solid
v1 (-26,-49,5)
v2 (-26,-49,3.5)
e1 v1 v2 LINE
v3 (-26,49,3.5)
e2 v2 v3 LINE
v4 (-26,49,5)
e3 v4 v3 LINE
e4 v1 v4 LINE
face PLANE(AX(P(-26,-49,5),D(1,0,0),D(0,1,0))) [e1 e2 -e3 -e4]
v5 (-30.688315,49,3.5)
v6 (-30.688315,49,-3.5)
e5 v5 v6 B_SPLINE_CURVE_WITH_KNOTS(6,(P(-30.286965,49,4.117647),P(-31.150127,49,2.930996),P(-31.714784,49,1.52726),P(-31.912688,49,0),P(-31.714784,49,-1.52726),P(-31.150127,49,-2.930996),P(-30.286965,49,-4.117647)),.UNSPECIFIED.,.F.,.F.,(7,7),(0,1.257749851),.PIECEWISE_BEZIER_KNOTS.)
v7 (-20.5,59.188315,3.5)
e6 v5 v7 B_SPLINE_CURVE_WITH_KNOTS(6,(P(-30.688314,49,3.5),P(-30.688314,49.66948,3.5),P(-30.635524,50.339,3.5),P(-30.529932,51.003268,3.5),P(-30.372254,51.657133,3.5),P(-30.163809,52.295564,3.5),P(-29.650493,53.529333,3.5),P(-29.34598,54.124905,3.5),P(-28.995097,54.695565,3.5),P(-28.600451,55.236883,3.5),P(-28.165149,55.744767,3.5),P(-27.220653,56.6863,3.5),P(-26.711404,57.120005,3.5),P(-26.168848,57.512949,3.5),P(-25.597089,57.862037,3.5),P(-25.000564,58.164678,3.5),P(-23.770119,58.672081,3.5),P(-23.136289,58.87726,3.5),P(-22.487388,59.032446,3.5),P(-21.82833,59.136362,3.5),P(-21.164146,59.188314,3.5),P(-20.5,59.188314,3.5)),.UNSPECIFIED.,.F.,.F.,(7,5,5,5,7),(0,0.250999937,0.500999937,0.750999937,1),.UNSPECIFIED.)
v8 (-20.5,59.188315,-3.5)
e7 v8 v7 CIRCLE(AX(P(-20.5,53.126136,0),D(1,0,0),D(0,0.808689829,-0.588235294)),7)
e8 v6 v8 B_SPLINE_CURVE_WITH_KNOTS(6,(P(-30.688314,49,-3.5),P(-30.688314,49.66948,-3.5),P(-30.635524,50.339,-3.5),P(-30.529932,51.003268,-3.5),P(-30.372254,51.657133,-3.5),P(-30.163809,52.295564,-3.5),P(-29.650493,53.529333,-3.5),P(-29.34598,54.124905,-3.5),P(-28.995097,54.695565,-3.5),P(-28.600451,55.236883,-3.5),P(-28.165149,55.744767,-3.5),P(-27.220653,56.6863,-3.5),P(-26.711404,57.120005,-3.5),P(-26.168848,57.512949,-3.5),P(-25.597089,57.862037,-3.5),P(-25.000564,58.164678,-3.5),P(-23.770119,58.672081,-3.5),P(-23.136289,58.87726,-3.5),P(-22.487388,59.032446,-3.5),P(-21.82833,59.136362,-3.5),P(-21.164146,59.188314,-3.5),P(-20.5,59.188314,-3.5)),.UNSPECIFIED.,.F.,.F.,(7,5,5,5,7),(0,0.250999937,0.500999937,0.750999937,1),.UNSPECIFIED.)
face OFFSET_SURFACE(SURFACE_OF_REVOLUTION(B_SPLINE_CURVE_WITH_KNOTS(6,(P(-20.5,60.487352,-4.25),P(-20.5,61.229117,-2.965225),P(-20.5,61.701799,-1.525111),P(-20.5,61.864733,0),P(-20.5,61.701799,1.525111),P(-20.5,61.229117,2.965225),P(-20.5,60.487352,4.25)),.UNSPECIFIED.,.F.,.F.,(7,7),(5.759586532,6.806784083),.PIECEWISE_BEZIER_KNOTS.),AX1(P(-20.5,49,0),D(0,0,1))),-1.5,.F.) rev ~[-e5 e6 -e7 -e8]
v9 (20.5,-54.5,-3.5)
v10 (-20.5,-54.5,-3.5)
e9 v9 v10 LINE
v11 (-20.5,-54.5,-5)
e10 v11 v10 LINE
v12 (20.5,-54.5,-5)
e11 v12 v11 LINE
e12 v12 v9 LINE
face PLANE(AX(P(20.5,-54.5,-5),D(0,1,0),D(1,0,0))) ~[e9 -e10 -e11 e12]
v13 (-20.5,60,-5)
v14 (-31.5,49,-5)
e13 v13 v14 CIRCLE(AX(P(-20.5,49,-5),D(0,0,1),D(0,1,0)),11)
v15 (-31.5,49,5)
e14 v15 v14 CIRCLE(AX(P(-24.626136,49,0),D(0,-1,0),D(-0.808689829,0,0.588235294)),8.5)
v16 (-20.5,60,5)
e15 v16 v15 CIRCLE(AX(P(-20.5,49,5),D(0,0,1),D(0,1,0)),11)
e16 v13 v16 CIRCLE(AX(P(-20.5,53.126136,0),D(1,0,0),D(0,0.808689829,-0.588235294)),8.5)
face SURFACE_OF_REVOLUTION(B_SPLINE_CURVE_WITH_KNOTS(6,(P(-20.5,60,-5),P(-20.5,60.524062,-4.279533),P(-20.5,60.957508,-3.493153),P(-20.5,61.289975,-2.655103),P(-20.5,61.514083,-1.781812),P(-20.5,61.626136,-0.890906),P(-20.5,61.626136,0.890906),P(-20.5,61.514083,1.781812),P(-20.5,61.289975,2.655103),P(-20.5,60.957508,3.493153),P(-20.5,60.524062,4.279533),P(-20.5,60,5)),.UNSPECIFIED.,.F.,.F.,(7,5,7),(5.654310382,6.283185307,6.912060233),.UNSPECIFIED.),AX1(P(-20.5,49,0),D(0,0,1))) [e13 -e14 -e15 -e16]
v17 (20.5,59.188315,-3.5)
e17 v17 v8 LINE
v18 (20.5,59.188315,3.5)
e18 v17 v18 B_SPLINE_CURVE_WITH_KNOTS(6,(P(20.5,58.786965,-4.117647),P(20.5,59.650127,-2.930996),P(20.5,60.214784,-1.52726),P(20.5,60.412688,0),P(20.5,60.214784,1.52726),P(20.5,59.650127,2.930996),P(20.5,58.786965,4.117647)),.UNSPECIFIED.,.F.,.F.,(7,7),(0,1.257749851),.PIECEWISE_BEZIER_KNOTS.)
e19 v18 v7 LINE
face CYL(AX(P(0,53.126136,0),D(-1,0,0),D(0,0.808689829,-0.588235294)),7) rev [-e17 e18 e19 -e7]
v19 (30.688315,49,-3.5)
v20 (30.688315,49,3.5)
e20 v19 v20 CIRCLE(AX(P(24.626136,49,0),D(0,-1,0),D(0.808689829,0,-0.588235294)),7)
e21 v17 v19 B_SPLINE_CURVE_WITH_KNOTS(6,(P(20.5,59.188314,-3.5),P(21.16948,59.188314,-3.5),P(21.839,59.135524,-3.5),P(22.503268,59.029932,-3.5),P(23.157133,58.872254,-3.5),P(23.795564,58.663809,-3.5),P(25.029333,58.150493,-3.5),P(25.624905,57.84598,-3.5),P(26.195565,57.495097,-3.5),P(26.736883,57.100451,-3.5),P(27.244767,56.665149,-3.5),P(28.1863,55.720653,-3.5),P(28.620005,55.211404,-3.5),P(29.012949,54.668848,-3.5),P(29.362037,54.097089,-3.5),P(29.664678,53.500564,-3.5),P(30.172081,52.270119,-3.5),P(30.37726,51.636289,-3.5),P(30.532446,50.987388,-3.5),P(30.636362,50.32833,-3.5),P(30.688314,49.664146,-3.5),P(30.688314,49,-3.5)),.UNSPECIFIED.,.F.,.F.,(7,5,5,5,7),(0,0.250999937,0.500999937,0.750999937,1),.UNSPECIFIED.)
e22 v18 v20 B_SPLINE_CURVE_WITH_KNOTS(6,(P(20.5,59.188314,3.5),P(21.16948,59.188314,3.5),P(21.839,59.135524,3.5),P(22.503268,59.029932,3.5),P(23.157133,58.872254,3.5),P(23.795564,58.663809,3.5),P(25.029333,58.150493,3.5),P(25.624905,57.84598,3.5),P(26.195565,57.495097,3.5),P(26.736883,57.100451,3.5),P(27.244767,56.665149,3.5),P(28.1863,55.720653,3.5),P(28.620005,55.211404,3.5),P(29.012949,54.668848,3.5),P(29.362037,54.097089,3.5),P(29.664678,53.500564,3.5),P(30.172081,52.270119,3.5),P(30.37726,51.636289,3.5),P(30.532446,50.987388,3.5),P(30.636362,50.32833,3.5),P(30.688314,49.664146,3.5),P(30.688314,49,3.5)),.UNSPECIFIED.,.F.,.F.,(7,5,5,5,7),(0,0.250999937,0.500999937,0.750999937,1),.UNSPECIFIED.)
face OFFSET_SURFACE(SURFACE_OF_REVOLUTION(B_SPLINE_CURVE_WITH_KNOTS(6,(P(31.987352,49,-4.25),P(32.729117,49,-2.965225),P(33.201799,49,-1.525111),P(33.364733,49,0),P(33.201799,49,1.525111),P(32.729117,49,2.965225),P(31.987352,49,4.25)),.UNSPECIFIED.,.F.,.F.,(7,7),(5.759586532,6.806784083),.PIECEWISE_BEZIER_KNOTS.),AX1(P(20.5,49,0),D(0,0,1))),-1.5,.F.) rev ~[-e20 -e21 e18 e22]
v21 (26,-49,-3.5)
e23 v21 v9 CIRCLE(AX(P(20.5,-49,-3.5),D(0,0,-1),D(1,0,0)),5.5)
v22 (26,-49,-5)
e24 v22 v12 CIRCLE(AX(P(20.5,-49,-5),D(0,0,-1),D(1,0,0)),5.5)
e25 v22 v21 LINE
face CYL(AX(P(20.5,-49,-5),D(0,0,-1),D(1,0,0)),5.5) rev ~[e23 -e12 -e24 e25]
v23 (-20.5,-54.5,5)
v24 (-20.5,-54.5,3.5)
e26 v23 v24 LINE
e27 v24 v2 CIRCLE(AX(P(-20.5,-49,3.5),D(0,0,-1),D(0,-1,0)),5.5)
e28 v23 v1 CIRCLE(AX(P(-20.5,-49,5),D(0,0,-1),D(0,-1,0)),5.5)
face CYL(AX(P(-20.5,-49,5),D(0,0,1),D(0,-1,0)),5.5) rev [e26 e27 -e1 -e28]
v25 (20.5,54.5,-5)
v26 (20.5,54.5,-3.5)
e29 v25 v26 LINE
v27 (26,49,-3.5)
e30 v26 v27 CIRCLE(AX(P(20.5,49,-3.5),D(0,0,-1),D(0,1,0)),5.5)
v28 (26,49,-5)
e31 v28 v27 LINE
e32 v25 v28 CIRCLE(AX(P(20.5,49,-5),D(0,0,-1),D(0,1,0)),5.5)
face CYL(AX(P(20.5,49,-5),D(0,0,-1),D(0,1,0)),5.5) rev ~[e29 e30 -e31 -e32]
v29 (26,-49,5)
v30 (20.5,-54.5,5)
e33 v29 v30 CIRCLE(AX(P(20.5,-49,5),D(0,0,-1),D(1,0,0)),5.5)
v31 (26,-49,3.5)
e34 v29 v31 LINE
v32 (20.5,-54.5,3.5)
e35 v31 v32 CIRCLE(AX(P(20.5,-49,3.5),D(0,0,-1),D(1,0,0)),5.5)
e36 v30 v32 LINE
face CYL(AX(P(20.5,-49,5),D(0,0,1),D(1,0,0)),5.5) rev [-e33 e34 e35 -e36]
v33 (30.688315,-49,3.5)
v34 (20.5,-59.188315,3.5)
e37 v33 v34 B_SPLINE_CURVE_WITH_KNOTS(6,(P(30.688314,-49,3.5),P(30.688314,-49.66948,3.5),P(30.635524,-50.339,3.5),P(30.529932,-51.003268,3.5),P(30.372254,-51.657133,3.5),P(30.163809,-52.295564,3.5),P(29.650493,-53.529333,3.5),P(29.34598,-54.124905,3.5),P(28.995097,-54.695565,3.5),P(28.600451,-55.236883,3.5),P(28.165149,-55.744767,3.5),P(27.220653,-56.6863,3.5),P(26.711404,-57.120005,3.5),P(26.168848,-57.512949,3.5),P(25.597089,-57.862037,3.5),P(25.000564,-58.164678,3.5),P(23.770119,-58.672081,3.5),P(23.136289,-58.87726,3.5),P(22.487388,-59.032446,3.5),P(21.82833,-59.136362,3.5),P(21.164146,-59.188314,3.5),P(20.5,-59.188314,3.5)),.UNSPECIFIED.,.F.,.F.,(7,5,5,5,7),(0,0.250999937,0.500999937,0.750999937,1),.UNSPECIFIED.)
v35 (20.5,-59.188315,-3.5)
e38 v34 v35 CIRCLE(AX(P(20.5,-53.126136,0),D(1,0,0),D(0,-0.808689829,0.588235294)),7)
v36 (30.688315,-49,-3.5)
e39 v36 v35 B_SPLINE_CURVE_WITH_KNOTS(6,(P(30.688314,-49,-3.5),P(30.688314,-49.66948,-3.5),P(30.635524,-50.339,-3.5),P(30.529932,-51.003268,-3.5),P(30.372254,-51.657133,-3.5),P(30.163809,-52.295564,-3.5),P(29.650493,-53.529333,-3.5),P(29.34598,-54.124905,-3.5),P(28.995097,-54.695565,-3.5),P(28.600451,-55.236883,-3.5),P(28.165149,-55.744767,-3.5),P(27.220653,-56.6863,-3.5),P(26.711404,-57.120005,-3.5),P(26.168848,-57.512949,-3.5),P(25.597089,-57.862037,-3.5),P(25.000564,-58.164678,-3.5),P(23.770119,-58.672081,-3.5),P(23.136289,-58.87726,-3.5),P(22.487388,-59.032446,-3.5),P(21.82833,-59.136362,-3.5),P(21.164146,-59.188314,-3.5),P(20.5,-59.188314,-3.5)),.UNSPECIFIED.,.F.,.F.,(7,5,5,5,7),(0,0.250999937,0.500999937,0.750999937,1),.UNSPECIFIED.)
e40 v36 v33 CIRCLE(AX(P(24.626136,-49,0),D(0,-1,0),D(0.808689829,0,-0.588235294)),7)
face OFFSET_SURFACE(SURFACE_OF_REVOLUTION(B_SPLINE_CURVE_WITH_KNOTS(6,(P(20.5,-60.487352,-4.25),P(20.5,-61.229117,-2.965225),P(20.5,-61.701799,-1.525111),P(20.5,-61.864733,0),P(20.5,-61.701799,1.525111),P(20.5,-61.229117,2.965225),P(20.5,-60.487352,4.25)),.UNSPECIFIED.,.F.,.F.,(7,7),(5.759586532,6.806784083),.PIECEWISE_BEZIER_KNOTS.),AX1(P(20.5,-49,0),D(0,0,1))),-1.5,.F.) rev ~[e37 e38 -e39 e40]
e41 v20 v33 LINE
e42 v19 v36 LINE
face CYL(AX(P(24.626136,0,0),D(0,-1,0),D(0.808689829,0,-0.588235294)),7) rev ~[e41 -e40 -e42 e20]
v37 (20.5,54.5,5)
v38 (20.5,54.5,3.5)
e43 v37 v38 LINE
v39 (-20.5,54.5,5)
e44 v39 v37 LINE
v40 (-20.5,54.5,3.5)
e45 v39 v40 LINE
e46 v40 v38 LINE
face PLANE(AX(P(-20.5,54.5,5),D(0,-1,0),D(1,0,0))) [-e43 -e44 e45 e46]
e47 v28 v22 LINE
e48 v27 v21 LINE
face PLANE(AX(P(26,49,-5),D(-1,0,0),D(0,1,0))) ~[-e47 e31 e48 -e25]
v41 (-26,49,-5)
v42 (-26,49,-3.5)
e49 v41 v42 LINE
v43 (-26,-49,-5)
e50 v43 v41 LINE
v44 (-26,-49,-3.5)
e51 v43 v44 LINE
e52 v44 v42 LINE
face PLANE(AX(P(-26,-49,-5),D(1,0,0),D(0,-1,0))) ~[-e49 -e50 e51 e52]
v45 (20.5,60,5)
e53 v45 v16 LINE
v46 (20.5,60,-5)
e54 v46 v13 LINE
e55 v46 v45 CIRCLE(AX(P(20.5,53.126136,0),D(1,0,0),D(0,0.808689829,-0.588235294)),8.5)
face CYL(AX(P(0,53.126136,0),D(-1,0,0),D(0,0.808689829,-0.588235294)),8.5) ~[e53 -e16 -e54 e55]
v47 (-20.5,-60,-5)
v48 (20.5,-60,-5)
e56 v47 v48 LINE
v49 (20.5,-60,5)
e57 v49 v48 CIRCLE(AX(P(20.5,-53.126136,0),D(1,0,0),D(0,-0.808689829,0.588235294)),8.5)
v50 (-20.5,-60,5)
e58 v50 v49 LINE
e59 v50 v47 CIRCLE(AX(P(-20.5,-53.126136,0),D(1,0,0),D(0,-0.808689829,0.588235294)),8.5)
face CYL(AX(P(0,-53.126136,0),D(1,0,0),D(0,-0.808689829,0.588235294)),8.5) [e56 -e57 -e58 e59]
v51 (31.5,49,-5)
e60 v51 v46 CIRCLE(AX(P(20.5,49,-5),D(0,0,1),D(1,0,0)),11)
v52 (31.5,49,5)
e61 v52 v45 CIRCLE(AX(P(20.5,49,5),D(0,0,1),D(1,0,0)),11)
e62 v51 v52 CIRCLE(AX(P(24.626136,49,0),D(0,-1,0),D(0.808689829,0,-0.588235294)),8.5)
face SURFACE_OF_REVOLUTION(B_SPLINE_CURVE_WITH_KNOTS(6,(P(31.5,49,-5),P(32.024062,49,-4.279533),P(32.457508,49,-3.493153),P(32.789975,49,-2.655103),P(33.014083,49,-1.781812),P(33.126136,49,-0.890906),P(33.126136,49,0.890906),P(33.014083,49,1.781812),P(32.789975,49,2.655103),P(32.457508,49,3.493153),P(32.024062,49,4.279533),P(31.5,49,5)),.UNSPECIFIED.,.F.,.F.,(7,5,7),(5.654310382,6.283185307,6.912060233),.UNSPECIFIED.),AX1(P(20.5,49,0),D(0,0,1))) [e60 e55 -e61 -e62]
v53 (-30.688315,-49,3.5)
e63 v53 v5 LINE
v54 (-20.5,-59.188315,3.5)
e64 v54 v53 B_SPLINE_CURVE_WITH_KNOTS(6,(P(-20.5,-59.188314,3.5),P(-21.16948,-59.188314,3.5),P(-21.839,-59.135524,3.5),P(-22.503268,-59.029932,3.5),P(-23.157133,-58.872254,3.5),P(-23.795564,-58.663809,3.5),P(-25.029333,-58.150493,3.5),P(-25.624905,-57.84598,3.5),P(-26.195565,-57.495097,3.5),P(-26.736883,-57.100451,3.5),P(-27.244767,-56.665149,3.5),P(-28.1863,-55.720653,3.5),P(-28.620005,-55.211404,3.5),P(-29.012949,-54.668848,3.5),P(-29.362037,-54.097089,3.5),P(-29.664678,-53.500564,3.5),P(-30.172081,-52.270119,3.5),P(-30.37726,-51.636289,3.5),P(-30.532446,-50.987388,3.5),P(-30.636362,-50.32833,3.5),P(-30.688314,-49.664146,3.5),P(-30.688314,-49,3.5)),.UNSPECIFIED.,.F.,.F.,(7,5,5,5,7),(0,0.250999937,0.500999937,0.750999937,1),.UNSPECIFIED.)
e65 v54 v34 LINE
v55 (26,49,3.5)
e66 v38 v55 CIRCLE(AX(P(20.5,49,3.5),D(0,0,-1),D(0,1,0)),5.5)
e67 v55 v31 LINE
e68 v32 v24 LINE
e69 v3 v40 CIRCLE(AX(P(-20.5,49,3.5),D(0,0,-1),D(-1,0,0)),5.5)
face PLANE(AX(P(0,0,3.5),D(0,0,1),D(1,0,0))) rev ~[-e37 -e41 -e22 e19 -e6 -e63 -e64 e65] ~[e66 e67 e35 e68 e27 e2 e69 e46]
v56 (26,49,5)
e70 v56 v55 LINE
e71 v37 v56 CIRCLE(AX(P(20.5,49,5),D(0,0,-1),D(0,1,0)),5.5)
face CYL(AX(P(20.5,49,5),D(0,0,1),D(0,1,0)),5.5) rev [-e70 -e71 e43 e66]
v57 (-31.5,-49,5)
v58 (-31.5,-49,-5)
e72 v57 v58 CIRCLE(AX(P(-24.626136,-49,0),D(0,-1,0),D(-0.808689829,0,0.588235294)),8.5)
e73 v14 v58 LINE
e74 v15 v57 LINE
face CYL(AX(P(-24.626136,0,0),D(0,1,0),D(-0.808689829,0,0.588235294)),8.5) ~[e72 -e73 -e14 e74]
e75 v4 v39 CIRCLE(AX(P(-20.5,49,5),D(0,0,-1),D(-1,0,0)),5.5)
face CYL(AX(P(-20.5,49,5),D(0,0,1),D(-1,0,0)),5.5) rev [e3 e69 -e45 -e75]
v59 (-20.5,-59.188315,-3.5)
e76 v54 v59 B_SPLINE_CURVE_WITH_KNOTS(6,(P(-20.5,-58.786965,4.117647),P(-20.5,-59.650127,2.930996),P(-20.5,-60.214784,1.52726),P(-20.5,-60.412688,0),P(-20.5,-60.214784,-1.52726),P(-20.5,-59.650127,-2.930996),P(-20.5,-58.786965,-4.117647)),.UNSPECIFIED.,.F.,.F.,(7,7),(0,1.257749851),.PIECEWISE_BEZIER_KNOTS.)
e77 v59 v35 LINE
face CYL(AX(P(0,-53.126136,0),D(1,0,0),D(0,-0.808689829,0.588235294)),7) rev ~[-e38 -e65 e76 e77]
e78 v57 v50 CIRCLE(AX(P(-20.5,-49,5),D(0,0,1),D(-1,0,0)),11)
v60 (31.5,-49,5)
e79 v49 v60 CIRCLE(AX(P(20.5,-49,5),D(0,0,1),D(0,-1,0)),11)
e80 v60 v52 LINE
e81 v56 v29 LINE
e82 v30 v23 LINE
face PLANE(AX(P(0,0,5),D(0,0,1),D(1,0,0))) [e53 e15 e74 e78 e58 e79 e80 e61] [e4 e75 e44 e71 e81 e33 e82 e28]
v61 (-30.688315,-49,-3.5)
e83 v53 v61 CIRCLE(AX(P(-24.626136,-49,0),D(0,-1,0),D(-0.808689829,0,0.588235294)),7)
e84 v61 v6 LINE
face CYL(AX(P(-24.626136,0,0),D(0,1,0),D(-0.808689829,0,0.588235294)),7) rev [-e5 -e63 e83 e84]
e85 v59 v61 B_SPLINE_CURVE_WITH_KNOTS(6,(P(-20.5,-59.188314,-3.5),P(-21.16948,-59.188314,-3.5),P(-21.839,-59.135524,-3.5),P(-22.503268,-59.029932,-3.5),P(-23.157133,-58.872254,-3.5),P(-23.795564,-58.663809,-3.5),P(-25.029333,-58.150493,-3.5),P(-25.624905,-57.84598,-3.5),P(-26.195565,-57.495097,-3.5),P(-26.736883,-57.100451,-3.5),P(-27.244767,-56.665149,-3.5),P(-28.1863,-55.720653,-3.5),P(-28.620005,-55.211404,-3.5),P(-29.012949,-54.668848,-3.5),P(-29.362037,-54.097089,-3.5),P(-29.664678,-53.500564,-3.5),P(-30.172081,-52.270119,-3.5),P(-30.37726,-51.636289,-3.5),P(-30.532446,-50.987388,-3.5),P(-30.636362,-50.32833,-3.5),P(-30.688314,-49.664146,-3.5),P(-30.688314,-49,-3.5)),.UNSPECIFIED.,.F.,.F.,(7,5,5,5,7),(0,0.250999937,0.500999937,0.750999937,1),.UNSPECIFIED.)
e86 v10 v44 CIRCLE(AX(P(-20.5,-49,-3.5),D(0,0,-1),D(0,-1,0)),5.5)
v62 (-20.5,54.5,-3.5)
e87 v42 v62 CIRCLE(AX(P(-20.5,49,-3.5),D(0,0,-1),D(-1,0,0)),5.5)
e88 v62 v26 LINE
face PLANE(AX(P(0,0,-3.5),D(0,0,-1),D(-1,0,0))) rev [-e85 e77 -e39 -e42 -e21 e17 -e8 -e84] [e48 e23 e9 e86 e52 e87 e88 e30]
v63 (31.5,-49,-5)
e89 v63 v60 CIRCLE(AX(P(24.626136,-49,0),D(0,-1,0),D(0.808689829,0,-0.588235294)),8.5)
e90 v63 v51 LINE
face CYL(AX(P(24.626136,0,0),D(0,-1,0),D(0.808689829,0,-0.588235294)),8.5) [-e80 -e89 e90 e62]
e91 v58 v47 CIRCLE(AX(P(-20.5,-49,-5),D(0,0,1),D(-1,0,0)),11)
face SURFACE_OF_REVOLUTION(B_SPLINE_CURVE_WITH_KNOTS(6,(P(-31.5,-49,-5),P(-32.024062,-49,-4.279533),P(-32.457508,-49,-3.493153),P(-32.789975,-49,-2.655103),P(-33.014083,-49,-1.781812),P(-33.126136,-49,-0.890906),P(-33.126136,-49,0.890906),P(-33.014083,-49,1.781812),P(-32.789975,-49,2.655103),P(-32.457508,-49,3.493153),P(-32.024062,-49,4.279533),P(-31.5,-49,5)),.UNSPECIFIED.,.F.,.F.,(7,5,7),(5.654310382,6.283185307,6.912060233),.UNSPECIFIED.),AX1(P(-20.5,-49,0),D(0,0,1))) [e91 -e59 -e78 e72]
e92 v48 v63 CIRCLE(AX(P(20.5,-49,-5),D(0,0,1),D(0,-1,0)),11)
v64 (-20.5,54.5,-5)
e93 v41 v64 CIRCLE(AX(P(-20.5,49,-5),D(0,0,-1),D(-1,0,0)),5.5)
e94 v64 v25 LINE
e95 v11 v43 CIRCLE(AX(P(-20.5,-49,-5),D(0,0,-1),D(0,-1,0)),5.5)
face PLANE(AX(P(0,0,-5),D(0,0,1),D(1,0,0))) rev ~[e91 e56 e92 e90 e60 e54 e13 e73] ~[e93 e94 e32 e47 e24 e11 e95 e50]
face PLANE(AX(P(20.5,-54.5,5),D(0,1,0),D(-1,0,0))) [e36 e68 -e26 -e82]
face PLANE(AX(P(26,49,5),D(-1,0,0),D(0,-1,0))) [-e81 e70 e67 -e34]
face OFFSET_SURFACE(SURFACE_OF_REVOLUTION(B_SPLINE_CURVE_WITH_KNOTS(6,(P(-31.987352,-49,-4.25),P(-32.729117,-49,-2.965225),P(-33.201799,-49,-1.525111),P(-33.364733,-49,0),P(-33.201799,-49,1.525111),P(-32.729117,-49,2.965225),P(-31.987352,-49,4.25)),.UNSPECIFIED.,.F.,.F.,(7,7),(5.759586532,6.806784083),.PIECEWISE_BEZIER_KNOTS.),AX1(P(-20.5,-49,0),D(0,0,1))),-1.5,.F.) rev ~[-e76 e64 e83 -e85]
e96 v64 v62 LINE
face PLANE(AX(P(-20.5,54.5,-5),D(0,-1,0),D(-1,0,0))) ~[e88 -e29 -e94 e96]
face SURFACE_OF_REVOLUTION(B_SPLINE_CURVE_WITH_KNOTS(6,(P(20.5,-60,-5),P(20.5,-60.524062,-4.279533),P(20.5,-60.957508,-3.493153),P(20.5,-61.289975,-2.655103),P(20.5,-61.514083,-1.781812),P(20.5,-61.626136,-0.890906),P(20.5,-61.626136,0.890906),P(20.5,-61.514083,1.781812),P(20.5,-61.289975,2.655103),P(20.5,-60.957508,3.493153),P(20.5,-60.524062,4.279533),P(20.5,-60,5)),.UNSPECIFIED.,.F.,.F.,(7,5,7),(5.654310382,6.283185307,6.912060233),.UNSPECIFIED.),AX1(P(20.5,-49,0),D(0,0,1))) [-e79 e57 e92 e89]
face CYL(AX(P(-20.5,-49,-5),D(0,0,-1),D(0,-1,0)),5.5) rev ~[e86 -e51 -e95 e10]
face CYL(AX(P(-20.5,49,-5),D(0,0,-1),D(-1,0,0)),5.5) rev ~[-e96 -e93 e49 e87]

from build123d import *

# Parameters (mm, degrees)
F1_DEPTH  = 5
F3_DEPTH  = 49
F5_DEPTH  = 20.5
F15_DEPTH = 1.5
F17_T     = 1.5


# Not quite as in the source:
# - a shell that OpenCascade refuses in one call is made with other operations: the cavity is built on its own and cut out


with BuildPart() as f1:
    # F0 (on Top) → F1 (new body, symmetric)
    with BuildSketch(Plane.XY):
        with BuildLine():
            Line((31.5, -49), (31.5, 49))
            ThreePointArc((31.5, 49), (28.2781745931, 56.7781745931), (20.5, 60))
            Line((20.5, 60), (-20.5, 60))
            ThreePointArc((-20.5, 60), (-28.2781745931, 56.7781745931), (-31.5, 49))
            Line((-31.5, 49), (-31.5, -49))
            ThreePointArc((-31.5, -49), (-28.2781745931, -56.7781745931), (-20.5, -60))
            Line((-20.5, -60), (20.5, -60))
            ThreePointArc((20.5, -60), (28.2781745931, -56.7781745931), (31.5, -49))
        make_face()
        with BuildLine():
            ThreePointArc((-29.5, 49), (-26.8639610307, 55.3639610307), (-20.5, 58))
            Line((-20.5, 58), (20.5, 58))
            ThreePointArc((20.5, 58), (26.8639610307, 55.3639610307), (29.5, 49))
            Line((29.5, 49), (29.5, -49))
            ThreePointArc((29.5, -49), (26.8639610307, -55.3639610307), (20.5, -58))
            Line((20.5, -58), (-20.5, -58))
            ThreePointArc((-20.5, -58), (-26.8639610307, -55.3639610307), (-29.5, -49))
            Line((-29.5, -49), (-29.5, 49))
        make_face(mode=Mode.SUBTRACT)
    extrude(amount=F1_DEPTH, both=True)

    # F2 (on Front) → F3 (join, symmetric)
    with BuildSketch(Plane.XZ):
        with BuildLine():
            Line((-31.5, -5), (-31.5, 5))
            ThreePointArc((-31.5, 5), (-33.1261364576, 0), (-31.5, -5))
        make_face()
        with BuildLine():
            ThreePointArc((31.5, -5), (33.1261364576, 0), (31.5, 5))
            Line((31.5, 5), (31.5, -5))
        make_face()
    extrude(amount=F3_DEPTH, both=True)

    # F4 (on Right) → F5 (join, symmetric)
    with BuildSketch(Plane.YZ):
        with BuildLine():
            ThreePointArc((60, -5), (61.6261364576, 0), (60, 5))
            Line((60, 5), (60, -5))
        make_face()
        with BuildLine():
            Line((-60, -5), (-60, 5))
            ThreePointArc((-60, 5), (-61.6261364576, 0), (-60, -5))
        make_face()
    extrude(amount=F5_DEPTH, both=True)

    # F7: sweep along a path in F0
    with BuildLine(Plane.XY) as f7_path:
        ThreePointArc((-20.5, 62), (-29.6923881554, 58.1923881554), (-33.5, 49))
    # F6 (on face) → F7 (sweep)
    with BuildSketch(Plane(origin=(-20.5, 0, 0), x_dir=(0, -1, 0), z_dir=(-1, 0, 0))):
        with BuildLine():
            ThreePointArc((-60, 5), (-61.6261364576, 0), (-60, -5))
            Line((-60, -5), (-60, 5))
        make_face()
    sweep(path=f7_path.line)

    # F9: sweep along a path in F0
    with BuildLine(Plane.XY) as f9_path:
        ThreePointArc((33.5, 49), (29.6923881554, 58.1923881554), (20.5, 62))
    # F8 (on face) → F9 (sweep)
    with BuildSketch(Plane.YZ.offset(20.5)):
        with BuildLine():
            Line((60, 5), (60, -5))
            ThreePointArc((60, -5), (61.6261364576, 0), (60, 5))
        make_face()
    sweep(path=f9_path.line)

    # F11: sweep along a path in F0
    with BuildLine(Plane.XY) as f11_path:
        ThreePointArc((20.5, -62), (29.6923881554, -58.1923881554), (33.5, -49))
    # F10 (on face) → F11 (sweep)
    with BuildSketch(Plane.YZ.offset(20.5)):
        with BuildLine():
            Line((-60, -5), (-60, 5))
            ThreePointArc((-60, 5), (-61.6261364576, 0), (-60, -5))
        make_face()
    sweep(path=f11_path.line)

    # F13: sweep along a path in F0
    with BuildLine(Plane.XY) as f13_path:
        ThreePointArc((-33.5, -49), (-29.6923881554, -58.1923881554), (-20.5, -62))
    # F12 (on face) → F13 (sweep)
    with BuildSketch(Plane(origin=(-20.5, 0, 0), x_dir=(0, -1, 0), z_dir=(-1, 0, 0))):
        with BuildLine():
            ThreePointArc((60, -5), (61.6261364576, 0), (60, 5))
            Line((60, 5), (60, -5))
        make_face()
    sweep(path=f13_path.line)

    # F14 (on face) → F15 (join)
    with BuildSketch(Plane.XY.offset(5)):
        with BuildLine():
            Line((20.5, 60), (-20.5, 60))
            ThreePointArc((-20.5, 60), (-28.2781745931, 56.7781745931), (-31.5, 49))
            Line((-31.5, 49), (-31.5, -49))
            ThreePointArc((-31.5, -49), (-28.2781745931, -56.7781745931), (-20.5, -60))
            Line((-20.5, -60), (20.5, -60))
            ThreePointArc((20.5, -60), (28.2781745931, -56.7781745931), (31.5, -49))
            Line((31.5, -49), (31.5, 49))
            ThreePointArc((31.5, 49), (28.2781745931, 56.7781745931), (20.5, 60))
        make_face()
        with BuildLine():
            Line((-29.5, -49), (-29.5, 49))
            ThreePointArc((-29.5, 49), (-26.8639610307, 55.3639610307), (-20.5, 58))
            Line((-20.5, 58), (20.5, 58))
            ThreePointArc((20.5, 58), (26.8639610307, 55.3639610307), (29.5, 49))
            Line((29.5, 49), (29.5, -49))
            ThreePointArc((29.5, -49), (26.8639610307, -55.3639610307), (20.5, -58))
            Line((20.5, -58), (-20.5, -58))
            ThreePointArc((-20.5, -58), (-26.8639610307, -55.3639610307), (-29.5, -49))
        make_face(mode=Mode.SUBTRACT)
        with BuildLine():
            ThreePointArc((-20.5, 58), (-26.8639610307, 55.3639610307), (-29.5, 49))
            Line((-29.5, 49), (-29.5, -49))
            ThreePointArc((-29.5, -49), (-26.8639610307, -55.3639610307), (-20.5, -58))
            Line((-20.5, -58), (20.5, -58))
            ThreePointArc((20.5, -58), (26.8639610307, -55.3639610307), (29.5, -49))
            Line((29.5, -49), (29.5, 49))
            ThreePointArc((29.5, 49), (26.8639610307, 55.3639610307), (20.5, 58))
            Line((20.5, 58), (-20.5, 58))
        make_face()
        with BuildLine():
            ThreePointArc((-26, 49), (-24.3890872965, 52.8890872965), (-20.5, 54.5))
            Line((-20.5, 54.5), (20.5, 54.5))
            ThreePointArc((20.5, 54.5), (24.3890872965, 52.8890872965), (26, 49))
            Line((26, 49), (26, -49))
            ThreePointArc((26, -49), (24.3890872965, -52.8890872965), (20.5, -54.5))
            Line((20.5, -54.5), (-20.5, -54.5))
            ThreePointArc((-20.5, -54.5), (-24.3890872965, -52.8890872965), (-26, -49))
            Line((-26, -49), (-26, 49))
        make_face(mode=Mode.SUBTRACT)
    extrude(amount=-F15_DEPTH)

    # F16: F1 across plane


with BuildPart() as f1_1:
    add(f1.part)
    add(f1.part.mirror(Plane.XY))

    # F17: shell of thickness 1.5, made by hand


with BuildPart() as f17_core1:
    # F17_t2: copy of F1
    add(f1_1.part)

    # the walls: a layer under each face that stays
    f17_faces = [f17_core1.faces().sort_by_distance(p)[0] for p in [
        (-27, -51.4285714286, -5),
        (33.1261364576, 0, 0),
        (29.4280267093, 57.9280267093, 0),
        (0, 61.6261364576, 0),
        (-29.4280267093, 57.9280267093, 0),
        (-33.1261364576, 0, 0),
        (-29.4280267093, -57.9280267093, 0),
        (0, -61.6261364576, 0),
        (29.4280267093, -57.9280267093, 0),
        (-27, -51.4285714286, 5),
        (24.3890872965, -52.8890872965, -4.25),
        (26, 0, -4.25),
        (0, -54.5, -4.25),
        (24.3890872965, 52.8890872965, -4.25),
        (-24.3890872965, -52.8890872965, -4.25),
        (0, 54.5, -4.25),
        (-26, 0, -4.25),
        (-24.3890872965, 52.8890872965, -4.25),
        (-27.5333333333, -54.1333333333, -3.5),
        (24.3890872965, -52.8890872965, 4.25),
        (26, 0, 4.25),
        (0, -54.5, 4.25),
        (24.3890872965, 52.8890872965, 4.25),
        (-24.3890872965, -52.8890872965, 4.25),
        (0, 54.5, 4.25),
        (-26, 0, 4.25),
        (-24.3890872965, 52.8890872965, 4.25),
        (-27.5333333333, -54.1333333333, 3.5),
    ]]
    thicken(f17_faces, amount=-F17_T, mode=Mode.SUBTRACT)


with BuildPart() as f1_2:
    add(f1_1.part)

    # what is left inside the walls is the cavity
    f17_cavity = [f17_core1.part.solids().sort_by_distance(p)[0] for p in [
        (-31.611136, 16.333334, 0),
    ]]
    add(f17_cavity, mode=Mode.SUBTRACT)


solid = f1_2.part
